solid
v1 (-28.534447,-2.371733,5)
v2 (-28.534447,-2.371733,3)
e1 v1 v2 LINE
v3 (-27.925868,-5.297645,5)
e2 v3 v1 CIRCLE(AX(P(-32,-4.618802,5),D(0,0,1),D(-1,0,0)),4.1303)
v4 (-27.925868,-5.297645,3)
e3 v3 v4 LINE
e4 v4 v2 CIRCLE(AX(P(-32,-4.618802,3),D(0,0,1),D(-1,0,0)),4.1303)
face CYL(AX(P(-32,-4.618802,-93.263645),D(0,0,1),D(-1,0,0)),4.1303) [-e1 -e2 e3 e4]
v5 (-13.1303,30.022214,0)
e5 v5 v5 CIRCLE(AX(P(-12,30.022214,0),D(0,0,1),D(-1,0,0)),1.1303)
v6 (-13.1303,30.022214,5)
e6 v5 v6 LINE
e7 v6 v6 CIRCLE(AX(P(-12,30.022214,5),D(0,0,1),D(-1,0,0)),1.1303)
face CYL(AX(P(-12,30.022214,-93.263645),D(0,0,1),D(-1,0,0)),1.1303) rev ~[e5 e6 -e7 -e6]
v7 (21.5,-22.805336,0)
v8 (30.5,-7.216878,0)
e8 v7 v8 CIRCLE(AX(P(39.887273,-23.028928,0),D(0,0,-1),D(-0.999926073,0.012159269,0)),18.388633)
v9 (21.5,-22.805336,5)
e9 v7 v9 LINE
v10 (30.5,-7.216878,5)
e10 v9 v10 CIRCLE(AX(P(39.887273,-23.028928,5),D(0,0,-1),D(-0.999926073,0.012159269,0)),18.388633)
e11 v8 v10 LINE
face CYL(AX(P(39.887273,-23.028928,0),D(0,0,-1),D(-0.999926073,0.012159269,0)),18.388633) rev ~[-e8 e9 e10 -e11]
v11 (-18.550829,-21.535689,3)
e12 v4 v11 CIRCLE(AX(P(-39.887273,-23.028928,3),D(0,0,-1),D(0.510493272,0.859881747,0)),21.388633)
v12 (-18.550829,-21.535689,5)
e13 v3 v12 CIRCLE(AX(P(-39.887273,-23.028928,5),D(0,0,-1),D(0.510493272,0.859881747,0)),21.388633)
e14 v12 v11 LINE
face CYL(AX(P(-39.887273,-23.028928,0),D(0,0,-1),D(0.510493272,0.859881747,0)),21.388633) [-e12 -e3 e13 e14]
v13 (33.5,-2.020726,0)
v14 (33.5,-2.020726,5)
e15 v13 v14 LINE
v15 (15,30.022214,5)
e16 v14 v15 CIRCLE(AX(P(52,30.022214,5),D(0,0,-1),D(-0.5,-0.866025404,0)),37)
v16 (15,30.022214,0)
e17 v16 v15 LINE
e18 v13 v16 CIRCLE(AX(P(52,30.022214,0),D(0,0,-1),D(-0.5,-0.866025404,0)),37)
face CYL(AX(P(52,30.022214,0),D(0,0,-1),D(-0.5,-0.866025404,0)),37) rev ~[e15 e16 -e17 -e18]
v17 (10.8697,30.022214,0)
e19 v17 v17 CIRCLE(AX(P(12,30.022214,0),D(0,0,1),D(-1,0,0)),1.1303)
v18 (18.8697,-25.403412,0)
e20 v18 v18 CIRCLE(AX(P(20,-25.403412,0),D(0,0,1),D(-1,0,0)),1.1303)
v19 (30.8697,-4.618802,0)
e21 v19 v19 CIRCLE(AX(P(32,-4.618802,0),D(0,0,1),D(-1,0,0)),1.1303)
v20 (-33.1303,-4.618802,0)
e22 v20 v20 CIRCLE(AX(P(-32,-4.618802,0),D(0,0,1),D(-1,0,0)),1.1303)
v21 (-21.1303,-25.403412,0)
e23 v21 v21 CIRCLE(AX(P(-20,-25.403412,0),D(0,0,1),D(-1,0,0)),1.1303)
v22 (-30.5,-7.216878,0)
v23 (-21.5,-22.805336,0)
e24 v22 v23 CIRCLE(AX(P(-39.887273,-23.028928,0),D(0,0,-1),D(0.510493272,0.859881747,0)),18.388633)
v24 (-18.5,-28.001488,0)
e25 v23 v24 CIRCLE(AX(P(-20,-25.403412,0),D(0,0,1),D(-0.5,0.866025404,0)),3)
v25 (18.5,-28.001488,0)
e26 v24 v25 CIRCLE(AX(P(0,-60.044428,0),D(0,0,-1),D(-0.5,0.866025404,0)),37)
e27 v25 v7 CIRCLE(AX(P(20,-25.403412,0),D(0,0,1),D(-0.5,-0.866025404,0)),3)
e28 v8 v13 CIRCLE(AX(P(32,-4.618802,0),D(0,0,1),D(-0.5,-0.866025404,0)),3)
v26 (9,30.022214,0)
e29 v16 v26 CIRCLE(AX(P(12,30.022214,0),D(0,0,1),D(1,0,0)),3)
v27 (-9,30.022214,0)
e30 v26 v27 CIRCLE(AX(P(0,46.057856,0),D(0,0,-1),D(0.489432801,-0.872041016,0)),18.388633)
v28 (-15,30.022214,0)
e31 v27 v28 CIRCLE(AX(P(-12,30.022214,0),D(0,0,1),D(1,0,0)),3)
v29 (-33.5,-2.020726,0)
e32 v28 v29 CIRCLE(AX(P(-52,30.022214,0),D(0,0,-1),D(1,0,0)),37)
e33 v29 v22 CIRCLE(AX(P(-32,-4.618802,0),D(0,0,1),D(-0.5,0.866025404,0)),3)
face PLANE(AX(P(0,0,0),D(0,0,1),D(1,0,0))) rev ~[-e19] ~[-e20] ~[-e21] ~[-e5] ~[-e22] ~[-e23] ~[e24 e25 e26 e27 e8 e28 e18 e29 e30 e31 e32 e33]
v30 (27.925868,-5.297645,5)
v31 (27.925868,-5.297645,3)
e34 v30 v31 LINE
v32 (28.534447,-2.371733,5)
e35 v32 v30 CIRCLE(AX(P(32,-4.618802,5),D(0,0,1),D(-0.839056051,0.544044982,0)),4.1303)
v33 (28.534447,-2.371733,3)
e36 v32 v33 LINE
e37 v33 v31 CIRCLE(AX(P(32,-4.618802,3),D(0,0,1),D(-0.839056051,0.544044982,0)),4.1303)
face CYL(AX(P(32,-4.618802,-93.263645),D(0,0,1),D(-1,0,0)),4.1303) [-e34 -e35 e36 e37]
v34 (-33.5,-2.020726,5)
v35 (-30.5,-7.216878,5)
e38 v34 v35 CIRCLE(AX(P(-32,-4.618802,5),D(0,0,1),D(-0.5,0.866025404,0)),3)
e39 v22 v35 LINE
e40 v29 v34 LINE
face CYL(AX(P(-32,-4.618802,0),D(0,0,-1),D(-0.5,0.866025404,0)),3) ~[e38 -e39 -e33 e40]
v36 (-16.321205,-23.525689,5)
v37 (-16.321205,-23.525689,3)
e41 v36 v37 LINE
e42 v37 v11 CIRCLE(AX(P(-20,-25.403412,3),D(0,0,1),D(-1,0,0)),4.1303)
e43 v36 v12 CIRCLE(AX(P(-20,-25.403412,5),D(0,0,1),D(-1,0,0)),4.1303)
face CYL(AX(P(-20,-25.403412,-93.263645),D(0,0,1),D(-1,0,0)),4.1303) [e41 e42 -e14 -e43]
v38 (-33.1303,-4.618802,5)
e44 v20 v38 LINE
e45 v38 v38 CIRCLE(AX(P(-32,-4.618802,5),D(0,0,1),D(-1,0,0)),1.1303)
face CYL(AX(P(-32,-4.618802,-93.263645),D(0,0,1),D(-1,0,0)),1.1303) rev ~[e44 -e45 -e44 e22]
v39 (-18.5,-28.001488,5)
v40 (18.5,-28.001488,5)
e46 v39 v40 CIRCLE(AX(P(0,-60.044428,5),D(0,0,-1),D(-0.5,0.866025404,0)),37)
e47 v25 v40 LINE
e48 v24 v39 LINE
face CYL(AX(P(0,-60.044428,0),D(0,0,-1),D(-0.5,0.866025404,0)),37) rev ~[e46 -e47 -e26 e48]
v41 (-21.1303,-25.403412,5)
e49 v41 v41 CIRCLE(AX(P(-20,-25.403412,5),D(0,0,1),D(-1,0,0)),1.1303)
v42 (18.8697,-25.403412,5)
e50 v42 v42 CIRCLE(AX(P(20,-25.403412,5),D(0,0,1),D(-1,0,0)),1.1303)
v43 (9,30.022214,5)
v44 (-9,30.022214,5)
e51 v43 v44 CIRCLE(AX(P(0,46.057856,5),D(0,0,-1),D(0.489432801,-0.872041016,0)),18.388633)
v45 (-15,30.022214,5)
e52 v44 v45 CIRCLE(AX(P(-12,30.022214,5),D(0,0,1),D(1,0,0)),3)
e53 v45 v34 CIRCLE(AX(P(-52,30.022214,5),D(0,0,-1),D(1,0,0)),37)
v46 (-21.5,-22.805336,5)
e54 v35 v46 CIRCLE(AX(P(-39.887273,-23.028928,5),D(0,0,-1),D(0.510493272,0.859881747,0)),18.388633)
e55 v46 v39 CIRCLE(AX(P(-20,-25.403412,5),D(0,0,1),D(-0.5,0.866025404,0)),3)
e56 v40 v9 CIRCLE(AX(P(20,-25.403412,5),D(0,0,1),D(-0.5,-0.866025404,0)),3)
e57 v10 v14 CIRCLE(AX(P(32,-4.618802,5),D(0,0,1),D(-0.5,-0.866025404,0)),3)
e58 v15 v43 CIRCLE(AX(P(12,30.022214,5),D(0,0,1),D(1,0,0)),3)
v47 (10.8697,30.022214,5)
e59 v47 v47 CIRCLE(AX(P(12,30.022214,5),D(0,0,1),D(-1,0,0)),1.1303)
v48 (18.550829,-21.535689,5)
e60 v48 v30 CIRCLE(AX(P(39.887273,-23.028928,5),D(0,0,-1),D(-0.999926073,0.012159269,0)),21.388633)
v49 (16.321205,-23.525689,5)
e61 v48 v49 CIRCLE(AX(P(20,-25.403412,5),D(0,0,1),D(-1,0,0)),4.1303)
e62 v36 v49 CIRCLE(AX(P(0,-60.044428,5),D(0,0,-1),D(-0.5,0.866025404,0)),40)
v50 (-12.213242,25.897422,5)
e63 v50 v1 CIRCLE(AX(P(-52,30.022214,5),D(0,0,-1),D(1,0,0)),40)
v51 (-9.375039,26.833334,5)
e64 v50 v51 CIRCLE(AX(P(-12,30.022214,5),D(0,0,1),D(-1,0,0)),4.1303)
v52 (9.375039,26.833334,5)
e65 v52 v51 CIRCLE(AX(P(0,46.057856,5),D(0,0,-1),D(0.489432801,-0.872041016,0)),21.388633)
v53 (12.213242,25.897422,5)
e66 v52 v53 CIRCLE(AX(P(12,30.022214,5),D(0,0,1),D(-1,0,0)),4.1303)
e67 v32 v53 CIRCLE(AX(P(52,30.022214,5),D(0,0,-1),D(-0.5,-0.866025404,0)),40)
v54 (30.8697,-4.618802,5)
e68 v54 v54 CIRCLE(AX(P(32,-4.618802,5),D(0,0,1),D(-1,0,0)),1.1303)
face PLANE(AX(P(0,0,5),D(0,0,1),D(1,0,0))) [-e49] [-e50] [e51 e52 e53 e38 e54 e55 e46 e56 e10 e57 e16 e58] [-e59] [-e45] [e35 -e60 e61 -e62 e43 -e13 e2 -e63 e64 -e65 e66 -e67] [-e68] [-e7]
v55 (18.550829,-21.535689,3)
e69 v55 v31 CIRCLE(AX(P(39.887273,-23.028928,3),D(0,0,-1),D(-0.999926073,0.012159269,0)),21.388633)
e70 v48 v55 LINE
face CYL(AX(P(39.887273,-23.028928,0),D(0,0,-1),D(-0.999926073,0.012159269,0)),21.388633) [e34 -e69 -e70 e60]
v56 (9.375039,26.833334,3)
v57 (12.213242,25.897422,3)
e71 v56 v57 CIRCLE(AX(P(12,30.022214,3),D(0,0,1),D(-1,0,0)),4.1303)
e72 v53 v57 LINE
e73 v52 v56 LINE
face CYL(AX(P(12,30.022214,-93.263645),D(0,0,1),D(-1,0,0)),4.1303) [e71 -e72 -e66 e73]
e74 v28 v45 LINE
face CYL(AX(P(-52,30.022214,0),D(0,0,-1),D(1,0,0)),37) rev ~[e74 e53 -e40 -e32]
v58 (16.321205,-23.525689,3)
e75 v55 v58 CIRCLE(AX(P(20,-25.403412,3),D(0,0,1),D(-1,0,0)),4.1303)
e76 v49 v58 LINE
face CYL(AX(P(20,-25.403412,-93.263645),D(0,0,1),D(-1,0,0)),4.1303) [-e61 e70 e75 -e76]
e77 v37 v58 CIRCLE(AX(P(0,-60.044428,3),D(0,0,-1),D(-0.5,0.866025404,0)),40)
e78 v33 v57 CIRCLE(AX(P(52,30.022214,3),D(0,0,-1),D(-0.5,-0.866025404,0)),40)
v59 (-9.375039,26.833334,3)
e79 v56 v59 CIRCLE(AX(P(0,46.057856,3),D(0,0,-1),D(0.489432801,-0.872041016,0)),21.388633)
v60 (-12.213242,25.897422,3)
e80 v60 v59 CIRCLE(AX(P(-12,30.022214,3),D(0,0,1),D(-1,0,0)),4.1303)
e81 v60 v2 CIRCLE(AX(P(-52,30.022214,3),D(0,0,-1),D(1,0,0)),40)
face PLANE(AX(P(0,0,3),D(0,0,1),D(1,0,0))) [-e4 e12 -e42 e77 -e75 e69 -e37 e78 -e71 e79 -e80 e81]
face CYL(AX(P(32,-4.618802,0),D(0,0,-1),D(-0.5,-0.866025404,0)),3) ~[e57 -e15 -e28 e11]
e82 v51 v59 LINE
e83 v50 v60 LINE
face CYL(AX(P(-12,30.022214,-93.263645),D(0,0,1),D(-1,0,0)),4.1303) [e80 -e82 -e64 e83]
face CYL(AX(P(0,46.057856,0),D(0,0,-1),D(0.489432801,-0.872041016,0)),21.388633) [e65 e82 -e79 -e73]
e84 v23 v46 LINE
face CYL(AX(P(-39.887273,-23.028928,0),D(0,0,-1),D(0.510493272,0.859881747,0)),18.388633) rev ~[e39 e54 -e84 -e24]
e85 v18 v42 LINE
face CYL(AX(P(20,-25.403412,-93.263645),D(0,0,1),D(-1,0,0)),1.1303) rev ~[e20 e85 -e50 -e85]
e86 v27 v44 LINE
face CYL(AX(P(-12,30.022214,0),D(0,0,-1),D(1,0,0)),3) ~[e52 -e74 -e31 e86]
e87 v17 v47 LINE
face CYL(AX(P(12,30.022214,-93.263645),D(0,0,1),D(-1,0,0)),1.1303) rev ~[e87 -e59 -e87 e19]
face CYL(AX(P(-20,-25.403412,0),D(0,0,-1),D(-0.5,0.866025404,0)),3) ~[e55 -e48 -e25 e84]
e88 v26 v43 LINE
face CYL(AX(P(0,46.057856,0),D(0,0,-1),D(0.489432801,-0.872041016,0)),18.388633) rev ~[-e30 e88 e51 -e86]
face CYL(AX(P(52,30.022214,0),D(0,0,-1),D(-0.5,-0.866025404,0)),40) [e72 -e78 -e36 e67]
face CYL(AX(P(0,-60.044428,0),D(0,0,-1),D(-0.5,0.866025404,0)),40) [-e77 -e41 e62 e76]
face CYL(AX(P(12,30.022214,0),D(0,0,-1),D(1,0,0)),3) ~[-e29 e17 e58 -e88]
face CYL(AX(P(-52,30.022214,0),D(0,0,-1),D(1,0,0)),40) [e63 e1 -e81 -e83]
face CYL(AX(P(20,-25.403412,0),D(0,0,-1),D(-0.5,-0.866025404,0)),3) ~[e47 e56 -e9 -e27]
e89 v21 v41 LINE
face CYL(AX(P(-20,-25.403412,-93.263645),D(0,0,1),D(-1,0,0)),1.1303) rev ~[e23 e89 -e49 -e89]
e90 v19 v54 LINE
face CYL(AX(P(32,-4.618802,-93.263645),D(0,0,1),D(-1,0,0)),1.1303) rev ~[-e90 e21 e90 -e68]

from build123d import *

# Parameters (mm, degrees)
F2_DEPTH    = 5
F3_D        = 2.2606
F4_T        = 3
F4_T3_DEPTH = 11


# Not quite as in the source:
# - a shell that OpenCascade refuses in one call is made with other operations: the cavity is built on its own and cut out


with BuildPart() as f2:
    # F1 (on Top) → F2 (new body)
    with BuildSketch(Plane.XY):
        with BuildLine():
            ThreePointArc((9, 30.0222139979), (0, 27.6692232402), (-9, 30.0222139979))
            ThreePointArc((-9, 30.0222139979), (-12, 33.0222139979), (-15, 30.0222139979))
            ThreePointArc((-15, 30.0222139979), (-19.95706006, 11.5222139979), (-33.5, -2.0207259422))
            ThreePointArc((-33.5, -2.0207259422), (-34.5980762114, -6.1188021535), (-30.5, -7.2168783649))
            ThreePointArc((-30.5, -7.2168783649), (-23.962250229, -13.8346116201), (-21.5, -22.805335633))
            ThreePointArc((-21.5, -22.805335633), (-22.5980762114, -26.9034118443), (-18.5, -28.0014880557))
            ThreePointArc((-18.5, -28.0014880557), (0, -23.0444279957), (18.5, -28.0014880557))
            ThreePointArc((18.5, -28.0014880557), (22.5980762114, -26.9034118443), (21.5, -22.805335633))
            ThreePointArc((21.5, -22.805335633), (23.962250229, -13.8346116201), (30.5, -7.2168783649))
            ThreePointArc((30.5, -7.2168783649), (34.5980762114, -6.1188021535), (33.5, -2.0207259422))
            ThreePointArc((33.5, -2.0207259422), (19.95706006, 11.5222139979), (15, 30.0222139979))
            ThreePointArc((15, 30.0222139979), (12, 33.0222139979), (9, 30.0222139979))
        make_face()
    extrude(amount=F2_DEPTH)

    # F3 (through all)
    with Locations(Plane(origin=(0, 0, 0), x_dir=(1, 0, 0), z_dir=(0, 0, -1))):
        with Locations((-12, -30.0222139979), (12, -30.0222139979), (32, 4.6188021535), (20, 25.4034118443), (-20, 25.4034118443), (-32, 4.6188021535)):
            Hole(F3_D / 2)

    # F4: shell of thickness 3, made by hand


with BuildPart() as f4_core1:
    # F4_t2: copy of F2
    add(f2.part)

    # the walls: a layer under each face that stays
    f4_faces = [f4_core1.faces().sort_by_distance(p)[0] for p in [
        (0, -23.0444279957, 2.5),
        (0, 2.3094010768, 0),
        (-23.962250229, -13.8346116201, 2.5),
        (23.962250229, -13.8346116201, 2.5),
        (-19.95706006, 11.5222139979, 2.5),
        (19.95706006, 11.5222139979, 2.5),
        (0, 27.6692232402, 2.5),
        (-21.1303, -25.4034118443, 2.5),
        (-33.1303, -4.6188021535, 2.5),
        (18.8697, -25.4034118443, 2.5),
        (30.8697, -4.6188021535, 2.5),
        (-13.1303, 30.0222139979, 2.5),
        (10.8697, 30.0222139979, 2.5),
    ]]
    thicken(f4_faces, amount=-F4_T, mode=Mode.SUBTRACT)

    # F4_s4 → F4_t3 (cut)
    with BuildSketch(Plane.XY.offset(-3)):
        Polygon((-21.5449977822, -22.7797196489), (-20, -25.4034118443), (-18.4788645602, -24.5251838887), (-18.5002217799, -22.7688578263), align=None)
        Polygon((21.5449977822, -22.7797196489), (20, -25.4034118443), (18.4788645602, -24.5251838887), (18.5002217799, -22.7688578263), align=None)
        Polygon((-30.5003147982, -7.2686555794), (-28.9685201827, -4.6372331239), (-30.4788645602, -3.7405741979), (-32, -4.6188021535), align=None)
        Polygon((30.5003147982, -7.2686555794), (28.9685201827, -4.6372331239), (30.4788645602, -3.7405741979), (32, -4.6188021535), align=None)
        Polygon((-8.955317016, 30.0483752283), (-12, 30.0222139979), (-12, 28.2657580866), (-10.4682984028, 27.4060909502), align=None)
        Polygon((8.955317016, 30.0483752283), (12, 30.0222139979), (12, 28.2657580866), (10.4682984028, 27.4060909502), align=None)
    extrude(amount=F4_T3_DEPTH, mode=Mode.SUBTRACT)


with BuildPart() as f2_1:
    add(f2.part)

    # what is left inside the walls is the cavity
    f4_cavity = [f4_core1.part.solids().sort_by_distance(p)[0] for p in [
        (0, -6.739348, 4.97),
    ]]
    add(f4_cavity, mode=Mode.SUBTRACT)


solid = f2_1.part
